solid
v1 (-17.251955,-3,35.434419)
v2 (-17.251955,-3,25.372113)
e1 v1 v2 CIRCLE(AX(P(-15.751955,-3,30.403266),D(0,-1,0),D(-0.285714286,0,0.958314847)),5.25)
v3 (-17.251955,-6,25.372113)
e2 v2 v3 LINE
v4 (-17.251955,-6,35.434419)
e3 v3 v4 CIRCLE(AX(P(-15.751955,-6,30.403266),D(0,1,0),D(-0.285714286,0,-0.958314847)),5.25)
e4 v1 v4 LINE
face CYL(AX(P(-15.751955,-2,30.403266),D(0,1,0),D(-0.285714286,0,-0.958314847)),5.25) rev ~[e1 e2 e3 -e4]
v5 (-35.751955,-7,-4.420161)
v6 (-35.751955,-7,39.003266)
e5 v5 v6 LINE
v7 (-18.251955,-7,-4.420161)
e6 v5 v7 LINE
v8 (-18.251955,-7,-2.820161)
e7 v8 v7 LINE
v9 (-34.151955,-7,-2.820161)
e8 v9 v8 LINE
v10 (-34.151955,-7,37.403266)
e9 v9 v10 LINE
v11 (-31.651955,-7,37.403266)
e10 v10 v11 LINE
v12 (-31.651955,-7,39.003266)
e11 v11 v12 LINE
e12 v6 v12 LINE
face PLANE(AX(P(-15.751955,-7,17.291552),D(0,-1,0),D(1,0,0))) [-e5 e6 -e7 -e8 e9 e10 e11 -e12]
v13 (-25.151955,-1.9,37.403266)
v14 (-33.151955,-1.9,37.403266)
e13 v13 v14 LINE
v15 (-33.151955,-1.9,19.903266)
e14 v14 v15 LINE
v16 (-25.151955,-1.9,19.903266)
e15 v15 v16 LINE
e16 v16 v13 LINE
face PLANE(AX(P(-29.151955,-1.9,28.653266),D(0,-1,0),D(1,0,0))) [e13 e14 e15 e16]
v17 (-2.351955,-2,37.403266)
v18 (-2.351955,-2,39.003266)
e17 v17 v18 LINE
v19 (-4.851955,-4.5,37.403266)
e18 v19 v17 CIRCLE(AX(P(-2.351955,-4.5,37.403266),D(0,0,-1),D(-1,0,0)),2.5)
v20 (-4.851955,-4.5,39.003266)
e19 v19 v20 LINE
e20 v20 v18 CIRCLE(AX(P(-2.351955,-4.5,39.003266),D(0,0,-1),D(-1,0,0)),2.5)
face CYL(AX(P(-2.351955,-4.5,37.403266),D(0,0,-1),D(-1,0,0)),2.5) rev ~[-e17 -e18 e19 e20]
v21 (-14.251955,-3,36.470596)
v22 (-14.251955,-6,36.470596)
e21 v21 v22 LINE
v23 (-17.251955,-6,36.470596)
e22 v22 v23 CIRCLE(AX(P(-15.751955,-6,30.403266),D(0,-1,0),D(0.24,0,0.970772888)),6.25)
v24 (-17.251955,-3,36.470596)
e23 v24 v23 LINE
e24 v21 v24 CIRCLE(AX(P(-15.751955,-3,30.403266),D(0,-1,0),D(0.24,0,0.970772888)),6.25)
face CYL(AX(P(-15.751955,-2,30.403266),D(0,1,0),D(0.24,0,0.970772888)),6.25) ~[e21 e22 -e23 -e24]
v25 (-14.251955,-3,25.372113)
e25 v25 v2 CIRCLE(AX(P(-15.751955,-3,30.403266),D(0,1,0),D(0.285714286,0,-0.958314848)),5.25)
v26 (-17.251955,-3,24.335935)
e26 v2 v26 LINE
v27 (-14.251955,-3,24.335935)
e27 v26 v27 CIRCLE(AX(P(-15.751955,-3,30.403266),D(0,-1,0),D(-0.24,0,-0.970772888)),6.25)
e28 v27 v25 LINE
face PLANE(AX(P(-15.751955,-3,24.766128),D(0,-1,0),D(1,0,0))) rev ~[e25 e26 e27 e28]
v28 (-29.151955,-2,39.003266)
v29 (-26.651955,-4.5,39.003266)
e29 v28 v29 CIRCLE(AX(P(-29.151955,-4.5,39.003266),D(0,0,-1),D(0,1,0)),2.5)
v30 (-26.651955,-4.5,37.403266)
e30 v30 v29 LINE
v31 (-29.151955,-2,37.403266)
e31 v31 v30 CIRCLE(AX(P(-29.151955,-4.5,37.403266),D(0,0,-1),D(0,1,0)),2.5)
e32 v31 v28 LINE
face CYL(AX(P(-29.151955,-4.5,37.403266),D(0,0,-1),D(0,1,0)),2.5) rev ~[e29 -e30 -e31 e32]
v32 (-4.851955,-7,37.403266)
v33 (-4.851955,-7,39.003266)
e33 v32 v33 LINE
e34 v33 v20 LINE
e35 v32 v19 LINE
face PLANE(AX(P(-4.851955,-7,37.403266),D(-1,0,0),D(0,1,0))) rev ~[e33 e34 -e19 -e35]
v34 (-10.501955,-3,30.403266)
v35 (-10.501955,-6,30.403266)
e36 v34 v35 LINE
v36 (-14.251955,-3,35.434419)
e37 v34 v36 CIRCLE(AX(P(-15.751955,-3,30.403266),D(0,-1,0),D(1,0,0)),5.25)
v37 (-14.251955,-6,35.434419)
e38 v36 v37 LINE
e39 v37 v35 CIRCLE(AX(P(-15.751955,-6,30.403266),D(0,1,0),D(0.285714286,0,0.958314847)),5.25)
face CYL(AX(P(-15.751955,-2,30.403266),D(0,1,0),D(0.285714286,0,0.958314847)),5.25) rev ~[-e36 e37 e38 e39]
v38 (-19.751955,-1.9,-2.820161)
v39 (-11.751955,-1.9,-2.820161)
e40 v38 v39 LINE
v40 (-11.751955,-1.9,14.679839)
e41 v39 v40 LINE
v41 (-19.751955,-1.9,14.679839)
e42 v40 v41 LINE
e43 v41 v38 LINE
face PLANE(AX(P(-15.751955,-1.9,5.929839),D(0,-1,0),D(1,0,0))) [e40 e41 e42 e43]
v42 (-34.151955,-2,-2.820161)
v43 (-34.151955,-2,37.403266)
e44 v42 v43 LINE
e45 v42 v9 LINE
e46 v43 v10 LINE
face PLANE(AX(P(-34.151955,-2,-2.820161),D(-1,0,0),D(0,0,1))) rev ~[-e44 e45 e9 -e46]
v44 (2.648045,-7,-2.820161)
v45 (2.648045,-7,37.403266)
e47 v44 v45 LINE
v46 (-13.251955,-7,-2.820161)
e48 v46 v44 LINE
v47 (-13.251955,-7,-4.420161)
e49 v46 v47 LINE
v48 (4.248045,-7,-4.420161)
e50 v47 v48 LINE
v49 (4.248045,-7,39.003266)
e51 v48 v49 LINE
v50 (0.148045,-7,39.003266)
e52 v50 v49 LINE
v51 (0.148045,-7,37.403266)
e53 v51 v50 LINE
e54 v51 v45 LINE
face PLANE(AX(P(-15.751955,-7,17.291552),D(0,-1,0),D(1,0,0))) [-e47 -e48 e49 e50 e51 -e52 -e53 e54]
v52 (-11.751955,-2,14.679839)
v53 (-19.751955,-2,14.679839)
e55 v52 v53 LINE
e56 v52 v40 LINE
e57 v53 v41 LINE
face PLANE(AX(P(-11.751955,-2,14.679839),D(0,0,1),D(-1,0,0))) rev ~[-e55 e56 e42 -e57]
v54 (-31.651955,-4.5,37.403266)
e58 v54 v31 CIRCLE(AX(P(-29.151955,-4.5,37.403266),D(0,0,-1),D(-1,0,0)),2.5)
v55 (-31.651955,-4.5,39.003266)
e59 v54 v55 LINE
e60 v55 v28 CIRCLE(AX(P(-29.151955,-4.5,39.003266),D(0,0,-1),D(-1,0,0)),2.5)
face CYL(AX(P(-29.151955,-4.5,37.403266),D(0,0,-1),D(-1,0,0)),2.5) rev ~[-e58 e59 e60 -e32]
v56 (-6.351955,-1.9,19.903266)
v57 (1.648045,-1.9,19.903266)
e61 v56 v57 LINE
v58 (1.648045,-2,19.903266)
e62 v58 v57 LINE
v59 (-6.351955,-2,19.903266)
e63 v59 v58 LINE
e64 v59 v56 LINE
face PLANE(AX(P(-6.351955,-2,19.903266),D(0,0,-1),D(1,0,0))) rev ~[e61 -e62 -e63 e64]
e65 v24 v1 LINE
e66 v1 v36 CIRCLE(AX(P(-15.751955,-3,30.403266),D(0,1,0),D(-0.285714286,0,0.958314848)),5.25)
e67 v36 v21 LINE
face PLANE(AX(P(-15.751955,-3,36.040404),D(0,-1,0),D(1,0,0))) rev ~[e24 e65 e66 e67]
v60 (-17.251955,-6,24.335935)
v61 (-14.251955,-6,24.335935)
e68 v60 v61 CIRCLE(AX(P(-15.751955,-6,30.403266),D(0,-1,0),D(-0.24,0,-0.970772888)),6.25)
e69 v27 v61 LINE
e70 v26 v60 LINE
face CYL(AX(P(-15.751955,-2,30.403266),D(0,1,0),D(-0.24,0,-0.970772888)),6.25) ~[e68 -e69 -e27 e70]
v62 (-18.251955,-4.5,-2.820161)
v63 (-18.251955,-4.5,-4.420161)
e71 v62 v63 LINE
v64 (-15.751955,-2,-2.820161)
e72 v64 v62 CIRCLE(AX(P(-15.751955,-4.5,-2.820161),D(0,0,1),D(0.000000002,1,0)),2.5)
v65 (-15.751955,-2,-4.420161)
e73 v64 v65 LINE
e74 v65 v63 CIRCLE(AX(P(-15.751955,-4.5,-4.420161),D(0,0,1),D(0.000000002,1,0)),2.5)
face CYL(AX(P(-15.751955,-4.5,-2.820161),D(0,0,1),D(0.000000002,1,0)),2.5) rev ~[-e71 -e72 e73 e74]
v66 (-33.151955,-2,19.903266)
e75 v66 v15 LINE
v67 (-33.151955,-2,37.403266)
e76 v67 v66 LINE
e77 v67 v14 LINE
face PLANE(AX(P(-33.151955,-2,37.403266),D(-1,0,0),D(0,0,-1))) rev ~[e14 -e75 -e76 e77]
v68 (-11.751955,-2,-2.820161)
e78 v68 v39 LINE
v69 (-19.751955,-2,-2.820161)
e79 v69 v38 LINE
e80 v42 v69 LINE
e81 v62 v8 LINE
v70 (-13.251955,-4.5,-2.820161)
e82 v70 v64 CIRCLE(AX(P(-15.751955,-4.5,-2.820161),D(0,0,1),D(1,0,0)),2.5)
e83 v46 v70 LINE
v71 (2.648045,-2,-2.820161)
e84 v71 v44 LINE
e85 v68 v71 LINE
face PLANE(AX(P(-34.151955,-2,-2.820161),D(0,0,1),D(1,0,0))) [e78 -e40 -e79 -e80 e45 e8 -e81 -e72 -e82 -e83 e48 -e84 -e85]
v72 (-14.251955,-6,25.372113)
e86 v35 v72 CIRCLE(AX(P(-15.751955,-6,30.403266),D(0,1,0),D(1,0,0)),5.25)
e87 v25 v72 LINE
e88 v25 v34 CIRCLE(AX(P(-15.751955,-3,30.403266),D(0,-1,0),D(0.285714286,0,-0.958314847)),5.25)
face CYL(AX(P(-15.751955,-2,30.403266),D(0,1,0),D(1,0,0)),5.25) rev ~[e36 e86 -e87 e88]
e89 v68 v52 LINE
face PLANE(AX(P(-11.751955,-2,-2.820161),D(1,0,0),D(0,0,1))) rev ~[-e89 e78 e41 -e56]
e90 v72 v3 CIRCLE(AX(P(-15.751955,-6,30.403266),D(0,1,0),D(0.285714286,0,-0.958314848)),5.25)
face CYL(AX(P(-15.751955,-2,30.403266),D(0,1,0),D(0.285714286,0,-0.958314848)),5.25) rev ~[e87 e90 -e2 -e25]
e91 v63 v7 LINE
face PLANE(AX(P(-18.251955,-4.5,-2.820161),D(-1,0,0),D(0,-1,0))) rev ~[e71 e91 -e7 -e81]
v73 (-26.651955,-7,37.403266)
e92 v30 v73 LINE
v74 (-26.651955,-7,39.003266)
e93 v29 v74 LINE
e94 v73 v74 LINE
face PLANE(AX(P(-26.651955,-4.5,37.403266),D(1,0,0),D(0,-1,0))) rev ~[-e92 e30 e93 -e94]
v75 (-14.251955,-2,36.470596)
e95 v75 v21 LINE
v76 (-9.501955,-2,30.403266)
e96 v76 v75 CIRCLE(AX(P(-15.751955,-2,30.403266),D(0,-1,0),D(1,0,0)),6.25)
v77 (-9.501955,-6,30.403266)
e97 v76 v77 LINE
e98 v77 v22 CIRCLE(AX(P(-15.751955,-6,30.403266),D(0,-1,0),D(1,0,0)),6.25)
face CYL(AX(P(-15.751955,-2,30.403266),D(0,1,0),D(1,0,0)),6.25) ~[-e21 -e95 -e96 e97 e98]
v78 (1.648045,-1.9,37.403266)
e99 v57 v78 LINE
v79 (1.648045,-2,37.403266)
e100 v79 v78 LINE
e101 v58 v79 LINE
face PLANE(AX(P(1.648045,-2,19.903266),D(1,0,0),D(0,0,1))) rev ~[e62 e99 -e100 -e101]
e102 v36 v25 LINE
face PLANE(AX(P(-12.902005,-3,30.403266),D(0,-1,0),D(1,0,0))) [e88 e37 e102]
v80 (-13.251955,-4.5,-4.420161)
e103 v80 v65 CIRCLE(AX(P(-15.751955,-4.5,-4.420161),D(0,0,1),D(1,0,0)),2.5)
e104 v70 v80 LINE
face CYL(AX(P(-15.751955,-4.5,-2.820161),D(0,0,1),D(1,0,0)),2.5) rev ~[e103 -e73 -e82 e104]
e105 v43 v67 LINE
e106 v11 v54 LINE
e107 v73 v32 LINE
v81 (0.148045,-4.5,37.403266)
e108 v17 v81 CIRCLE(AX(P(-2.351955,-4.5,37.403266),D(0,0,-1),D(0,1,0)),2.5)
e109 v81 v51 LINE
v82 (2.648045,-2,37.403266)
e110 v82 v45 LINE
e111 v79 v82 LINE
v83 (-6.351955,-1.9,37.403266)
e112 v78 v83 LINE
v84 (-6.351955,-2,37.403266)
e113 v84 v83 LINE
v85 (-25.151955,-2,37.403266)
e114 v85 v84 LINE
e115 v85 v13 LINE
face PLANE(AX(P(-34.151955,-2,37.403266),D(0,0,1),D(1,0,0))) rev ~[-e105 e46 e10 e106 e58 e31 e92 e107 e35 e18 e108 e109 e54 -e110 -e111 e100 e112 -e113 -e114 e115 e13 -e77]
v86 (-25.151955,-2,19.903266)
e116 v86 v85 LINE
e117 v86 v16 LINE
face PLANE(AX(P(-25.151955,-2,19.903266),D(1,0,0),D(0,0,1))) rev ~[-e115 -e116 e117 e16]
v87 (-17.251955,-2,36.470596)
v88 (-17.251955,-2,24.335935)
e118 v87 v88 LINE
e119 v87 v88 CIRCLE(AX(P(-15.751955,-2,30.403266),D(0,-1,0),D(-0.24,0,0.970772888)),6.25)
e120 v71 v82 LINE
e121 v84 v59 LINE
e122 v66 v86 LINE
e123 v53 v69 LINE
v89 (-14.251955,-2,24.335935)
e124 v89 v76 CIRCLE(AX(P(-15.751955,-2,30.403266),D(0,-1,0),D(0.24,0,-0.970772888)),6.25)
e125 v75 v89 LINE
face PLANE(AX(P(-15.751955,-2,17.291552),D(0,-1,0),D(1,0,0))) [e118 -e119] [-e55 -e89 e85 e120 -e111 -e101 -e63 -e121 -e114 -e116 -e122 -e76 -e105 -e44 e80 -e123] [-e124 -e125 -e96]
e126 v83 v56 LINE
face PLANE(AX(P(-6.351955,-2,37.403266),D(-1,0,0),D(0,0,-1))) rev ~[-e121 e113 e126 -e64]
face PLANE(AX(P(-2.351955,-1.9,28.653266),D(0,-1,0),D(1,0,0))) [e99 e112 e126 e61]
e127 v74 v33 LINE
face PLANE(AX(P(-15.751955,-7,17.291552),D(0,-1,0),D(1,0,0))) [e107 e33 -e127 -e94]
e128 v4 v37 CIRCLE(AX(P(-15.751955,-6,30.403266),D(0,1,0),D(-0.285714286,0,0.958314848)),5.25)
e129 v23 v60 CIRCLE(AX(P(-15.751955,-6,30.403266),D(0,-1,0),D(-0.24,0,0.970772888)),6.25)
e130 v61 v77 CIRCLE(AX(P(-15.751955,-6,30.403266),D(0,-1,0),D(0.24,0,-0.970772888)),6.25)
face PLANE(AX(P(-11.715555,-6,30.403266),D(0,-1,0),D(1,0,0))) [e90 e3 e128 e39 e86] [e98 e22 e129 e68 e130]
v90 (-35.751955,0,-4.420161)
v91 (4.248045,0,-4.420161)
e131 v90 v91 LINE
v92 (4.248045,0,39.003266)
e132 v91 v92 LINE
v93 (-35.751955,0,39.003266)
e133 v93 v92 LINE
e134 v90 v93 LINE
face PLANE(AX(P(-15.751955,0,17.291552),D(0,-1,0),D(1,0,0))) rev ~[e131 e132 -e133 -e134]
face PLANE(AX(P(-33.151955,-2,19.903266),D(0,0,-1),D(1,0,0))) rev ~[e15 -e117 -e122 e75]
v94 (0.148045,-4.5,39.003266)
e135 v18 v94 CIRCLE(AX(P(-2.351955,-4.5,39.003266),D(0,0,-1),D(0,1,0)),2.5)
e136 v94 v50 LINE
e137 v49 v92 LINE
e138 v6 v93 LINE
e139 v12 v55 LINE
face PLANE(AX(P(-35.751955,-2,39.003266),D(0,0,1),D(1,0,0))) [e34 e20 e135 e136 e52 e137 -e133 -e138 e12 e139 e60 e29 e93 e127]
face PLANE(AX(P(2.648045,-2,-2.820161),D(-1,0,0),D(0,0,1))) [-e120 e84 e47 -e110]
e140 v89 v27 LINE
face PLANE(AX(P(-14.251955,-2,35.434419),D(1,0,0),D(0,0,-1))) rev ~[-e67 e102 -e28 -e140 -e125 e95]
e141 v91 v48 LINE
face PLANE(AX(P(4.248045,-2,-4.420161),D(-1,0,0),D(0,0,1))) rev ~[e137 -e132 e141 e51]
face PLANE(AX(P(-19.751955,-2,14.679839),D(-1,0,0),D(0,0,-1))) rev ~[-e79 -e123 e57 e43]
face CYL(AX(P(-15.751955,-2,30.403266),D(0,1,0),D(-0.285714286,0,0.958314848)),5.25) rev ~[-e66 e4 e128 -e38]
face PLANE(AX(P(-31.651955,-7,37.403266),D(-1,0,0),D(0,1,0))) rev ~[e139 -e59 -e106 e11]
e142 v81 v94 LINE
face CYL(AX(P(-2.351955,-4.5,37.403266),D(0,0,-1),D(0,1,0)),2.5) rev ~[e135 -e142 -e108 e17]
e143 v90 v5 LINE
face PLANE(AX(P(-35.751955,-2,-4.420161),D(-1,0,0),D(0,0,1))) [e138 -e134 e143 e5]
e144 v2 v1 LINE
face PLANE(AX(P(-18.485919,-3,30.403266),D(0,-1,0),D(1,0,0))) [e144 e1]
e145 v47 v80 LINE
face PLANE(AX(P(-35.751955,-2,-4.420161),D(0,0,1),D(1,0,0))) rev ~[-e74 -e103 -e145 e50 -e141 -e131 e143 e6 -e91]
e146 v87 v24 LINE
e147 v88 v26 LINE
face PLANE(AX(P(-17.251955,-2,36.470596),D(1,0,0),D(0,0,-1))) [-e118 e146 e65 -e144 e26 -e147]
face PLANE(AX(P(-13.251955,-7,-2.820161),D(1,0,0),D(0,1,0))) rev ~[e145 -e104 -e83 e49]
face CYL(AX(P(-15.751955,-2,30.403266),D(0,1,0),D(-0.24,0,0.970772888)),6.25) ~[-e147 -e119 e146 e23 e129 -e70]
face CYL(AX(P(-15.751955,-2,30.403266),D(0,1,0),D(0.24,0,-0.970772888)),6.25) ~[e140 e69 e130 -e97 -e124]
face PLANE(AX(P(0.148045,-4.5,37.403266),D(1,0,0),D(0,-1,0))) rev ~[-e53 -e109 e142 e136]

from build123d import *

# Parameters (mm, degrees)
F0_W      = 40
F0_H      = 43.4234265382
F1_DEPTH  = 2
F2_W      = 40
F2_H      = 43.4234265382
F2_W_2    = 36.8
F2_H_2    = 40.2234265382
F3_DEPTH  = 5
F5_DEPTH  = 1.6
F7_DEPTH  = 1
F8_DEPTH  = 4
F9_DEPTH  = 1
F11_DEPTH = 1.6
F13_DEPTH = 0.1


with BuildPart() as f1:
    # F0 (on Front) → F1 (new body)
    with BuildSketch(Plane.XZ):
        with Locations((-15.7519546337, 17.2915523872)):
            Rectangle(F0_W, F0_H)
    extrude(amount=F1_DEPTH)

    # F2 (on face) → F3 (join)
    with BuildSketch(Plane.XZ.offset(2)):
        with Locations((-15.7519546337, 17.2915523872)):
            Rectangle(F2_W, F2_H)
        with Locations((-15.7519546337, 17.2915523872)):
            Rectangle(F2_W_2, F2_H_2, mode=Mode.SUBTRACT)
    extrude(amount=F3_DEPTH)

    # F4 (on face) → F5 (cut, through all)
    with BuildSketch(Plane(origin=(0, 0, 37.4032656563), x_dir=(1, 0, 0), z_dir=(0, 0, -1))):
        with BuildLine():
            ThreePointArc((-4.8519546337, 4.5), (-4.1197215867, 2.732233047), (-2.3519546337, 2))
            ThreePointArc((-2.3519546337, 2), (-0.5841876808, 2.732233047), (0.1480453663, 4.5))
            ThreePointArc((0.1480453663, 4.5), (-0.5841876808, 6.267766953), (-2.3519546337, 7))
            ThreePointArc((-2.3519546337, 7), (-4.1197215867, 6.267766953), (-4.8519546337, 4.5))
        make_face()
        with BuildLine():
            ThreePointArc((-29.1519546337, 2), (-27.3841876808, 2.732233047), (-26.6519546337, 4.5))
            ThreePointArc((-26.6519546337, 4.5), (-27.3841876808, 6.267766953), (-29.1519546337, 7))
            ThreePointArc((-29.1519546337, 7), (-30.9197215867, 6.267766953), (-31.6519546337, 4.5))
            ThreePointArc((-31.6519546337, 4.5), (-30.9197215867, 2.732233047), (-29.1519546337, 2))
        make_face()
        with BuildLine():
            ThreePointArc((-29.1519546337, 7), (-27.3841876808, 6.267766953), (-26.6519546337, 4.5))
            Line((-26.6519546337, 4.5), (-26.6519546337, 7))
            Line((-26.6519546337, 7), (-29.1519546337, 7))
        make_face()
        with BuildLine():
            ThreePointArc((-31.6519546337, 4.5), (-30.9197215867, 6.267766953), (-29.1519546337, 7))
            Line((-29.1519546337, 7), (-31.6519546337, 7))
            Line((-31.6519546337, 7), (-31.6519546337, 4.5))
        make_face()
        with BuildLine():
            Line((-2.3519546337, 7), (-4.8519546337, 7))
            Line((-4.8519546337, 7), (-4.8519546337, 4.5))
            ThreePointArc((-4.8519546337, 4.5), (-4.1197215867, 6.267766953), (-2.3519546337, 7))
        make_face()
        with BuildLine():
            ThreePointArc((-2.3519546337, 7), (-0.5841876808, 6.267766953), (0.1480453663, 4.5))
            Line((0.1480453663, 4.5), (0.1480453663, 7))
            Line((0.1480453663, 7), (-2.3519546337, 7))
        make_face()
    extrude(amount=-F5_DEPTH, mode=Mode.SUBTRACT)

    # F6 (on face) → F7 (join)
    with BuildSketch(Plane.XZ.offset(2)):
        with BuildLine():
            Line((-17.2519546337, 25.3721127069), (-17.2519546337, 35.4344186057))
            ThreePointArc((-17.2519546337, 35.4344186057), (-21.0019546337, 30.4032656563), (-17.2519546337, 25.3721127069))
        make_face()
        with BuildLine():
            ThreePointArc((-14.2519546337, 25.3721127069), (-11.5425900736, 27.2657905568), (-10.5019546337, 30.4032656563))
            ThreePointArc((-10.5019546337, 30.4032656563), (-11.5425900736, 33.5407407558), (-14.2519546337, 35.4344186057))
            Line((-14.2519546337, 35.4344186057), (-14.2519546337, 25.3721127069))
        make_face()
    extrude(amount=F7_DEPTH)

    # F6 (on face) → F8 (join)
    with BuildSketch(Plane.XZ.offset(2)):
        with BuildLine():
            ThreePointArc((-14.2519546337, 35.4344186057), (-11.5425900736, 33.5407407558), (-10.5019546337, 30.4032656563))
            ThreePointArc((-10.5019546337, 30.4032656563), (-11.5425900736, 27.2657905568), (-14.2519546337, 25.3721127069))
            Line((-14.2519546337, 25.3721127069), (-14.2519546337, 24.3359351065))
            ThreePointArc((-14.2519546337, 24.3359351065), (-10.8306997125, 26.5505069044), (-9.5019546337, 30.4032656563))
            ThreePointArc((-9.5019546337, 30.4032656563), (-10.8306997125, 34.2560244081), (-14.2519546337, 36.470596206))
            Line((-14.2519546337, 36.470596206), (-14.2519546337, 35.4344186057))
        make_face()
        with BuildLine():
            ThreePointArc((-17.2519546337, 35.4344186057), (-15.7519546337, 35.6532656563), (-14.2519546337, 35.4344186057))
            Line((-14.2519546337, 35.4344186057), (-14.2519546337, 36.470596206))
            ThreePointArc((-14.2519546337, 36.470596206), (-15.7519546337, 36.6532656563), (-17.2519546337, 36.470596206))
            Line((-17.2519546337, 36.470596206), (-17.2519546337, 35.4344186057))
        make_face()
        with BuildLine():
            Line((-14.2519546337, 24.3359351065), (-14.2519546337, 25.3721127069))
            ThreePointArc((-14.2519546337, 25.3721127069), (-15.7519546337, 25.1532656563), (-17.2519546337, 25.3721127069))
            Line((-17.2519546337, 25.3721127069), (-17.2519546337, 24.3359351065))
            ThreePointArc((-17.2519546337, 24.3359351065), (-15.7519546337, 24.1532656563), (-14.2519546337, 24.3359351065))
        make_face()
        with BuildLine():
            ThreePointArc((-17.2519546337, 25.3721127069), (-21.0019546337, 30.4032656563), (-17.2519546337, 35.4344186057))
            Line((-17.2519546337, 35.4344186057), (-17.2519546337, 36.470596206))
            ThreePointArc((-17.2519546337, 36.470596206), (-22.0019546337, 30.4032656563), (-17.2519546337, 24.3359351065))
            Line((-17.2519546337, 24.3359351065), (-17.2519546337, 25.3721127069))
        make_face()
    extrude(amount=F8_DEPTH)

    # F6 (on face) → F9 (cut)
    with BuildSketch(Plane.XZ.offset(2)):
        with BuildLine():
            ThreePointArc((-17.2519546337, 35.4344186057), (-15.7519546337, 35.6532656563), (-14.2519546337, 35.4344186057))
            Line((-14.2519546337, 35.4344186057), (-14.2519546337, 36.470596206))
            ThreePointArc((-14.2519546337, 36.470596206), (-15.7519546337, 36.6532656563), (-17.2519546337, 36.470596206))
            Line((-17.2519546337, 36.470596206), (-17.2519546337, 35.4344186057))
        make_face()
        with BuildLine():
            Line((-14.2519546337, 24.3359351065), (-14.2519546337, 25.3721127069))
            ThreePointArc((-14.2519546337, 25.3721127069), (-15.7519546337, 25.1532656563), (-17.2519546337, 25.3721127069))
            Line((-17.2519546337, 25.3721127069), (-17.2519546337, 24.3359351065))
            ThreePointArc((-17.2519546337, 24.3359351065), (-15.7519546337, 24.1532656563), (-14.2519546337, 24.3359351065))
        make_face()
    extrude(amount=F9_DEPTH, mode=Mode.SUBTRACT)

    # F10 (on face) → F11 (cut, through all)
    with BuildSketch(Plane.XY.offset(-2.8201608819)):
        with BuildLine():
            Line((-13.2519546337, -7), (-13.2519546337, -4.5))
            ThreePointArc((-13.2519546337, -4.5), (-13.9841876808, -6.267766953), (-15.7519546337, -7))
            Line((-15.7519546337, -7), (-13.2519546337, -7))
        make_face()
        with BuildLine():
            ThreePointArc((-15.7519546337, -7), (-13.9841876808, -6.267766953), (-13.2519546337, -4.5))
            ThreePointArc((-13.2519546337, -4.5), (-13.984187679, -2.7322330488), (-15.7519546286, -2))
            ThreePointArc((-15.7519546286, -2), (-17.5197215849, -2.7322330452), (-18.2519546337, -4.5))
            ThreePointArc((-18.2519546337, -4.5), (-17.5197215867, -6.267766953), (-15.7519546337, -7))
        make_face()
        with BuildLine():
            Line((-18.2519546337, -7), (-15.7519546337, -7))
            ThreePointArc((-15.7519546337, -7), (-17.5197215867, -6.267766953), (-18.2519546337, -4.5))
            Line((-18.2519546337, -4.5), (-18.2519546337, -7))
        make_face()
    extrude(amount=-F11_DEPTH, mode=Mode.SUBTRACT)

    # F12 (on face) → F13 (cut)
    with BuildSketch(Plane.XZ.offset(2)):
        Polygon((-29.1519546337, 37.4032656563), (-33.1519546337, 37.4032656563), (-33.1519546337, 19.9032656563), (-25.1519546337, 19.9032656563), (-25.1519546337, 37.4032656563), align=None)
        Polygon((-2.3519546468, 37.4032656563), (-6.3519546337, 37.4032656563), (-6.3519546337, 19.9032656563), (1.6480453663, 19.9032656563), (1.6480453663, 37.4032656563), align=None)
        Polygon((-19.7519546337, 14.6798391181), (-19.7519546337, -2.8201608819), (-15.7519546337, -2.8201608819), (-11.7519546337, -2.8201608819), (-11.7519546337, 14.6798391181), align=None)
    extrude(amount=-F13_DEPTH, mode=Mode.SUBTRACT)


solid = f1.part
